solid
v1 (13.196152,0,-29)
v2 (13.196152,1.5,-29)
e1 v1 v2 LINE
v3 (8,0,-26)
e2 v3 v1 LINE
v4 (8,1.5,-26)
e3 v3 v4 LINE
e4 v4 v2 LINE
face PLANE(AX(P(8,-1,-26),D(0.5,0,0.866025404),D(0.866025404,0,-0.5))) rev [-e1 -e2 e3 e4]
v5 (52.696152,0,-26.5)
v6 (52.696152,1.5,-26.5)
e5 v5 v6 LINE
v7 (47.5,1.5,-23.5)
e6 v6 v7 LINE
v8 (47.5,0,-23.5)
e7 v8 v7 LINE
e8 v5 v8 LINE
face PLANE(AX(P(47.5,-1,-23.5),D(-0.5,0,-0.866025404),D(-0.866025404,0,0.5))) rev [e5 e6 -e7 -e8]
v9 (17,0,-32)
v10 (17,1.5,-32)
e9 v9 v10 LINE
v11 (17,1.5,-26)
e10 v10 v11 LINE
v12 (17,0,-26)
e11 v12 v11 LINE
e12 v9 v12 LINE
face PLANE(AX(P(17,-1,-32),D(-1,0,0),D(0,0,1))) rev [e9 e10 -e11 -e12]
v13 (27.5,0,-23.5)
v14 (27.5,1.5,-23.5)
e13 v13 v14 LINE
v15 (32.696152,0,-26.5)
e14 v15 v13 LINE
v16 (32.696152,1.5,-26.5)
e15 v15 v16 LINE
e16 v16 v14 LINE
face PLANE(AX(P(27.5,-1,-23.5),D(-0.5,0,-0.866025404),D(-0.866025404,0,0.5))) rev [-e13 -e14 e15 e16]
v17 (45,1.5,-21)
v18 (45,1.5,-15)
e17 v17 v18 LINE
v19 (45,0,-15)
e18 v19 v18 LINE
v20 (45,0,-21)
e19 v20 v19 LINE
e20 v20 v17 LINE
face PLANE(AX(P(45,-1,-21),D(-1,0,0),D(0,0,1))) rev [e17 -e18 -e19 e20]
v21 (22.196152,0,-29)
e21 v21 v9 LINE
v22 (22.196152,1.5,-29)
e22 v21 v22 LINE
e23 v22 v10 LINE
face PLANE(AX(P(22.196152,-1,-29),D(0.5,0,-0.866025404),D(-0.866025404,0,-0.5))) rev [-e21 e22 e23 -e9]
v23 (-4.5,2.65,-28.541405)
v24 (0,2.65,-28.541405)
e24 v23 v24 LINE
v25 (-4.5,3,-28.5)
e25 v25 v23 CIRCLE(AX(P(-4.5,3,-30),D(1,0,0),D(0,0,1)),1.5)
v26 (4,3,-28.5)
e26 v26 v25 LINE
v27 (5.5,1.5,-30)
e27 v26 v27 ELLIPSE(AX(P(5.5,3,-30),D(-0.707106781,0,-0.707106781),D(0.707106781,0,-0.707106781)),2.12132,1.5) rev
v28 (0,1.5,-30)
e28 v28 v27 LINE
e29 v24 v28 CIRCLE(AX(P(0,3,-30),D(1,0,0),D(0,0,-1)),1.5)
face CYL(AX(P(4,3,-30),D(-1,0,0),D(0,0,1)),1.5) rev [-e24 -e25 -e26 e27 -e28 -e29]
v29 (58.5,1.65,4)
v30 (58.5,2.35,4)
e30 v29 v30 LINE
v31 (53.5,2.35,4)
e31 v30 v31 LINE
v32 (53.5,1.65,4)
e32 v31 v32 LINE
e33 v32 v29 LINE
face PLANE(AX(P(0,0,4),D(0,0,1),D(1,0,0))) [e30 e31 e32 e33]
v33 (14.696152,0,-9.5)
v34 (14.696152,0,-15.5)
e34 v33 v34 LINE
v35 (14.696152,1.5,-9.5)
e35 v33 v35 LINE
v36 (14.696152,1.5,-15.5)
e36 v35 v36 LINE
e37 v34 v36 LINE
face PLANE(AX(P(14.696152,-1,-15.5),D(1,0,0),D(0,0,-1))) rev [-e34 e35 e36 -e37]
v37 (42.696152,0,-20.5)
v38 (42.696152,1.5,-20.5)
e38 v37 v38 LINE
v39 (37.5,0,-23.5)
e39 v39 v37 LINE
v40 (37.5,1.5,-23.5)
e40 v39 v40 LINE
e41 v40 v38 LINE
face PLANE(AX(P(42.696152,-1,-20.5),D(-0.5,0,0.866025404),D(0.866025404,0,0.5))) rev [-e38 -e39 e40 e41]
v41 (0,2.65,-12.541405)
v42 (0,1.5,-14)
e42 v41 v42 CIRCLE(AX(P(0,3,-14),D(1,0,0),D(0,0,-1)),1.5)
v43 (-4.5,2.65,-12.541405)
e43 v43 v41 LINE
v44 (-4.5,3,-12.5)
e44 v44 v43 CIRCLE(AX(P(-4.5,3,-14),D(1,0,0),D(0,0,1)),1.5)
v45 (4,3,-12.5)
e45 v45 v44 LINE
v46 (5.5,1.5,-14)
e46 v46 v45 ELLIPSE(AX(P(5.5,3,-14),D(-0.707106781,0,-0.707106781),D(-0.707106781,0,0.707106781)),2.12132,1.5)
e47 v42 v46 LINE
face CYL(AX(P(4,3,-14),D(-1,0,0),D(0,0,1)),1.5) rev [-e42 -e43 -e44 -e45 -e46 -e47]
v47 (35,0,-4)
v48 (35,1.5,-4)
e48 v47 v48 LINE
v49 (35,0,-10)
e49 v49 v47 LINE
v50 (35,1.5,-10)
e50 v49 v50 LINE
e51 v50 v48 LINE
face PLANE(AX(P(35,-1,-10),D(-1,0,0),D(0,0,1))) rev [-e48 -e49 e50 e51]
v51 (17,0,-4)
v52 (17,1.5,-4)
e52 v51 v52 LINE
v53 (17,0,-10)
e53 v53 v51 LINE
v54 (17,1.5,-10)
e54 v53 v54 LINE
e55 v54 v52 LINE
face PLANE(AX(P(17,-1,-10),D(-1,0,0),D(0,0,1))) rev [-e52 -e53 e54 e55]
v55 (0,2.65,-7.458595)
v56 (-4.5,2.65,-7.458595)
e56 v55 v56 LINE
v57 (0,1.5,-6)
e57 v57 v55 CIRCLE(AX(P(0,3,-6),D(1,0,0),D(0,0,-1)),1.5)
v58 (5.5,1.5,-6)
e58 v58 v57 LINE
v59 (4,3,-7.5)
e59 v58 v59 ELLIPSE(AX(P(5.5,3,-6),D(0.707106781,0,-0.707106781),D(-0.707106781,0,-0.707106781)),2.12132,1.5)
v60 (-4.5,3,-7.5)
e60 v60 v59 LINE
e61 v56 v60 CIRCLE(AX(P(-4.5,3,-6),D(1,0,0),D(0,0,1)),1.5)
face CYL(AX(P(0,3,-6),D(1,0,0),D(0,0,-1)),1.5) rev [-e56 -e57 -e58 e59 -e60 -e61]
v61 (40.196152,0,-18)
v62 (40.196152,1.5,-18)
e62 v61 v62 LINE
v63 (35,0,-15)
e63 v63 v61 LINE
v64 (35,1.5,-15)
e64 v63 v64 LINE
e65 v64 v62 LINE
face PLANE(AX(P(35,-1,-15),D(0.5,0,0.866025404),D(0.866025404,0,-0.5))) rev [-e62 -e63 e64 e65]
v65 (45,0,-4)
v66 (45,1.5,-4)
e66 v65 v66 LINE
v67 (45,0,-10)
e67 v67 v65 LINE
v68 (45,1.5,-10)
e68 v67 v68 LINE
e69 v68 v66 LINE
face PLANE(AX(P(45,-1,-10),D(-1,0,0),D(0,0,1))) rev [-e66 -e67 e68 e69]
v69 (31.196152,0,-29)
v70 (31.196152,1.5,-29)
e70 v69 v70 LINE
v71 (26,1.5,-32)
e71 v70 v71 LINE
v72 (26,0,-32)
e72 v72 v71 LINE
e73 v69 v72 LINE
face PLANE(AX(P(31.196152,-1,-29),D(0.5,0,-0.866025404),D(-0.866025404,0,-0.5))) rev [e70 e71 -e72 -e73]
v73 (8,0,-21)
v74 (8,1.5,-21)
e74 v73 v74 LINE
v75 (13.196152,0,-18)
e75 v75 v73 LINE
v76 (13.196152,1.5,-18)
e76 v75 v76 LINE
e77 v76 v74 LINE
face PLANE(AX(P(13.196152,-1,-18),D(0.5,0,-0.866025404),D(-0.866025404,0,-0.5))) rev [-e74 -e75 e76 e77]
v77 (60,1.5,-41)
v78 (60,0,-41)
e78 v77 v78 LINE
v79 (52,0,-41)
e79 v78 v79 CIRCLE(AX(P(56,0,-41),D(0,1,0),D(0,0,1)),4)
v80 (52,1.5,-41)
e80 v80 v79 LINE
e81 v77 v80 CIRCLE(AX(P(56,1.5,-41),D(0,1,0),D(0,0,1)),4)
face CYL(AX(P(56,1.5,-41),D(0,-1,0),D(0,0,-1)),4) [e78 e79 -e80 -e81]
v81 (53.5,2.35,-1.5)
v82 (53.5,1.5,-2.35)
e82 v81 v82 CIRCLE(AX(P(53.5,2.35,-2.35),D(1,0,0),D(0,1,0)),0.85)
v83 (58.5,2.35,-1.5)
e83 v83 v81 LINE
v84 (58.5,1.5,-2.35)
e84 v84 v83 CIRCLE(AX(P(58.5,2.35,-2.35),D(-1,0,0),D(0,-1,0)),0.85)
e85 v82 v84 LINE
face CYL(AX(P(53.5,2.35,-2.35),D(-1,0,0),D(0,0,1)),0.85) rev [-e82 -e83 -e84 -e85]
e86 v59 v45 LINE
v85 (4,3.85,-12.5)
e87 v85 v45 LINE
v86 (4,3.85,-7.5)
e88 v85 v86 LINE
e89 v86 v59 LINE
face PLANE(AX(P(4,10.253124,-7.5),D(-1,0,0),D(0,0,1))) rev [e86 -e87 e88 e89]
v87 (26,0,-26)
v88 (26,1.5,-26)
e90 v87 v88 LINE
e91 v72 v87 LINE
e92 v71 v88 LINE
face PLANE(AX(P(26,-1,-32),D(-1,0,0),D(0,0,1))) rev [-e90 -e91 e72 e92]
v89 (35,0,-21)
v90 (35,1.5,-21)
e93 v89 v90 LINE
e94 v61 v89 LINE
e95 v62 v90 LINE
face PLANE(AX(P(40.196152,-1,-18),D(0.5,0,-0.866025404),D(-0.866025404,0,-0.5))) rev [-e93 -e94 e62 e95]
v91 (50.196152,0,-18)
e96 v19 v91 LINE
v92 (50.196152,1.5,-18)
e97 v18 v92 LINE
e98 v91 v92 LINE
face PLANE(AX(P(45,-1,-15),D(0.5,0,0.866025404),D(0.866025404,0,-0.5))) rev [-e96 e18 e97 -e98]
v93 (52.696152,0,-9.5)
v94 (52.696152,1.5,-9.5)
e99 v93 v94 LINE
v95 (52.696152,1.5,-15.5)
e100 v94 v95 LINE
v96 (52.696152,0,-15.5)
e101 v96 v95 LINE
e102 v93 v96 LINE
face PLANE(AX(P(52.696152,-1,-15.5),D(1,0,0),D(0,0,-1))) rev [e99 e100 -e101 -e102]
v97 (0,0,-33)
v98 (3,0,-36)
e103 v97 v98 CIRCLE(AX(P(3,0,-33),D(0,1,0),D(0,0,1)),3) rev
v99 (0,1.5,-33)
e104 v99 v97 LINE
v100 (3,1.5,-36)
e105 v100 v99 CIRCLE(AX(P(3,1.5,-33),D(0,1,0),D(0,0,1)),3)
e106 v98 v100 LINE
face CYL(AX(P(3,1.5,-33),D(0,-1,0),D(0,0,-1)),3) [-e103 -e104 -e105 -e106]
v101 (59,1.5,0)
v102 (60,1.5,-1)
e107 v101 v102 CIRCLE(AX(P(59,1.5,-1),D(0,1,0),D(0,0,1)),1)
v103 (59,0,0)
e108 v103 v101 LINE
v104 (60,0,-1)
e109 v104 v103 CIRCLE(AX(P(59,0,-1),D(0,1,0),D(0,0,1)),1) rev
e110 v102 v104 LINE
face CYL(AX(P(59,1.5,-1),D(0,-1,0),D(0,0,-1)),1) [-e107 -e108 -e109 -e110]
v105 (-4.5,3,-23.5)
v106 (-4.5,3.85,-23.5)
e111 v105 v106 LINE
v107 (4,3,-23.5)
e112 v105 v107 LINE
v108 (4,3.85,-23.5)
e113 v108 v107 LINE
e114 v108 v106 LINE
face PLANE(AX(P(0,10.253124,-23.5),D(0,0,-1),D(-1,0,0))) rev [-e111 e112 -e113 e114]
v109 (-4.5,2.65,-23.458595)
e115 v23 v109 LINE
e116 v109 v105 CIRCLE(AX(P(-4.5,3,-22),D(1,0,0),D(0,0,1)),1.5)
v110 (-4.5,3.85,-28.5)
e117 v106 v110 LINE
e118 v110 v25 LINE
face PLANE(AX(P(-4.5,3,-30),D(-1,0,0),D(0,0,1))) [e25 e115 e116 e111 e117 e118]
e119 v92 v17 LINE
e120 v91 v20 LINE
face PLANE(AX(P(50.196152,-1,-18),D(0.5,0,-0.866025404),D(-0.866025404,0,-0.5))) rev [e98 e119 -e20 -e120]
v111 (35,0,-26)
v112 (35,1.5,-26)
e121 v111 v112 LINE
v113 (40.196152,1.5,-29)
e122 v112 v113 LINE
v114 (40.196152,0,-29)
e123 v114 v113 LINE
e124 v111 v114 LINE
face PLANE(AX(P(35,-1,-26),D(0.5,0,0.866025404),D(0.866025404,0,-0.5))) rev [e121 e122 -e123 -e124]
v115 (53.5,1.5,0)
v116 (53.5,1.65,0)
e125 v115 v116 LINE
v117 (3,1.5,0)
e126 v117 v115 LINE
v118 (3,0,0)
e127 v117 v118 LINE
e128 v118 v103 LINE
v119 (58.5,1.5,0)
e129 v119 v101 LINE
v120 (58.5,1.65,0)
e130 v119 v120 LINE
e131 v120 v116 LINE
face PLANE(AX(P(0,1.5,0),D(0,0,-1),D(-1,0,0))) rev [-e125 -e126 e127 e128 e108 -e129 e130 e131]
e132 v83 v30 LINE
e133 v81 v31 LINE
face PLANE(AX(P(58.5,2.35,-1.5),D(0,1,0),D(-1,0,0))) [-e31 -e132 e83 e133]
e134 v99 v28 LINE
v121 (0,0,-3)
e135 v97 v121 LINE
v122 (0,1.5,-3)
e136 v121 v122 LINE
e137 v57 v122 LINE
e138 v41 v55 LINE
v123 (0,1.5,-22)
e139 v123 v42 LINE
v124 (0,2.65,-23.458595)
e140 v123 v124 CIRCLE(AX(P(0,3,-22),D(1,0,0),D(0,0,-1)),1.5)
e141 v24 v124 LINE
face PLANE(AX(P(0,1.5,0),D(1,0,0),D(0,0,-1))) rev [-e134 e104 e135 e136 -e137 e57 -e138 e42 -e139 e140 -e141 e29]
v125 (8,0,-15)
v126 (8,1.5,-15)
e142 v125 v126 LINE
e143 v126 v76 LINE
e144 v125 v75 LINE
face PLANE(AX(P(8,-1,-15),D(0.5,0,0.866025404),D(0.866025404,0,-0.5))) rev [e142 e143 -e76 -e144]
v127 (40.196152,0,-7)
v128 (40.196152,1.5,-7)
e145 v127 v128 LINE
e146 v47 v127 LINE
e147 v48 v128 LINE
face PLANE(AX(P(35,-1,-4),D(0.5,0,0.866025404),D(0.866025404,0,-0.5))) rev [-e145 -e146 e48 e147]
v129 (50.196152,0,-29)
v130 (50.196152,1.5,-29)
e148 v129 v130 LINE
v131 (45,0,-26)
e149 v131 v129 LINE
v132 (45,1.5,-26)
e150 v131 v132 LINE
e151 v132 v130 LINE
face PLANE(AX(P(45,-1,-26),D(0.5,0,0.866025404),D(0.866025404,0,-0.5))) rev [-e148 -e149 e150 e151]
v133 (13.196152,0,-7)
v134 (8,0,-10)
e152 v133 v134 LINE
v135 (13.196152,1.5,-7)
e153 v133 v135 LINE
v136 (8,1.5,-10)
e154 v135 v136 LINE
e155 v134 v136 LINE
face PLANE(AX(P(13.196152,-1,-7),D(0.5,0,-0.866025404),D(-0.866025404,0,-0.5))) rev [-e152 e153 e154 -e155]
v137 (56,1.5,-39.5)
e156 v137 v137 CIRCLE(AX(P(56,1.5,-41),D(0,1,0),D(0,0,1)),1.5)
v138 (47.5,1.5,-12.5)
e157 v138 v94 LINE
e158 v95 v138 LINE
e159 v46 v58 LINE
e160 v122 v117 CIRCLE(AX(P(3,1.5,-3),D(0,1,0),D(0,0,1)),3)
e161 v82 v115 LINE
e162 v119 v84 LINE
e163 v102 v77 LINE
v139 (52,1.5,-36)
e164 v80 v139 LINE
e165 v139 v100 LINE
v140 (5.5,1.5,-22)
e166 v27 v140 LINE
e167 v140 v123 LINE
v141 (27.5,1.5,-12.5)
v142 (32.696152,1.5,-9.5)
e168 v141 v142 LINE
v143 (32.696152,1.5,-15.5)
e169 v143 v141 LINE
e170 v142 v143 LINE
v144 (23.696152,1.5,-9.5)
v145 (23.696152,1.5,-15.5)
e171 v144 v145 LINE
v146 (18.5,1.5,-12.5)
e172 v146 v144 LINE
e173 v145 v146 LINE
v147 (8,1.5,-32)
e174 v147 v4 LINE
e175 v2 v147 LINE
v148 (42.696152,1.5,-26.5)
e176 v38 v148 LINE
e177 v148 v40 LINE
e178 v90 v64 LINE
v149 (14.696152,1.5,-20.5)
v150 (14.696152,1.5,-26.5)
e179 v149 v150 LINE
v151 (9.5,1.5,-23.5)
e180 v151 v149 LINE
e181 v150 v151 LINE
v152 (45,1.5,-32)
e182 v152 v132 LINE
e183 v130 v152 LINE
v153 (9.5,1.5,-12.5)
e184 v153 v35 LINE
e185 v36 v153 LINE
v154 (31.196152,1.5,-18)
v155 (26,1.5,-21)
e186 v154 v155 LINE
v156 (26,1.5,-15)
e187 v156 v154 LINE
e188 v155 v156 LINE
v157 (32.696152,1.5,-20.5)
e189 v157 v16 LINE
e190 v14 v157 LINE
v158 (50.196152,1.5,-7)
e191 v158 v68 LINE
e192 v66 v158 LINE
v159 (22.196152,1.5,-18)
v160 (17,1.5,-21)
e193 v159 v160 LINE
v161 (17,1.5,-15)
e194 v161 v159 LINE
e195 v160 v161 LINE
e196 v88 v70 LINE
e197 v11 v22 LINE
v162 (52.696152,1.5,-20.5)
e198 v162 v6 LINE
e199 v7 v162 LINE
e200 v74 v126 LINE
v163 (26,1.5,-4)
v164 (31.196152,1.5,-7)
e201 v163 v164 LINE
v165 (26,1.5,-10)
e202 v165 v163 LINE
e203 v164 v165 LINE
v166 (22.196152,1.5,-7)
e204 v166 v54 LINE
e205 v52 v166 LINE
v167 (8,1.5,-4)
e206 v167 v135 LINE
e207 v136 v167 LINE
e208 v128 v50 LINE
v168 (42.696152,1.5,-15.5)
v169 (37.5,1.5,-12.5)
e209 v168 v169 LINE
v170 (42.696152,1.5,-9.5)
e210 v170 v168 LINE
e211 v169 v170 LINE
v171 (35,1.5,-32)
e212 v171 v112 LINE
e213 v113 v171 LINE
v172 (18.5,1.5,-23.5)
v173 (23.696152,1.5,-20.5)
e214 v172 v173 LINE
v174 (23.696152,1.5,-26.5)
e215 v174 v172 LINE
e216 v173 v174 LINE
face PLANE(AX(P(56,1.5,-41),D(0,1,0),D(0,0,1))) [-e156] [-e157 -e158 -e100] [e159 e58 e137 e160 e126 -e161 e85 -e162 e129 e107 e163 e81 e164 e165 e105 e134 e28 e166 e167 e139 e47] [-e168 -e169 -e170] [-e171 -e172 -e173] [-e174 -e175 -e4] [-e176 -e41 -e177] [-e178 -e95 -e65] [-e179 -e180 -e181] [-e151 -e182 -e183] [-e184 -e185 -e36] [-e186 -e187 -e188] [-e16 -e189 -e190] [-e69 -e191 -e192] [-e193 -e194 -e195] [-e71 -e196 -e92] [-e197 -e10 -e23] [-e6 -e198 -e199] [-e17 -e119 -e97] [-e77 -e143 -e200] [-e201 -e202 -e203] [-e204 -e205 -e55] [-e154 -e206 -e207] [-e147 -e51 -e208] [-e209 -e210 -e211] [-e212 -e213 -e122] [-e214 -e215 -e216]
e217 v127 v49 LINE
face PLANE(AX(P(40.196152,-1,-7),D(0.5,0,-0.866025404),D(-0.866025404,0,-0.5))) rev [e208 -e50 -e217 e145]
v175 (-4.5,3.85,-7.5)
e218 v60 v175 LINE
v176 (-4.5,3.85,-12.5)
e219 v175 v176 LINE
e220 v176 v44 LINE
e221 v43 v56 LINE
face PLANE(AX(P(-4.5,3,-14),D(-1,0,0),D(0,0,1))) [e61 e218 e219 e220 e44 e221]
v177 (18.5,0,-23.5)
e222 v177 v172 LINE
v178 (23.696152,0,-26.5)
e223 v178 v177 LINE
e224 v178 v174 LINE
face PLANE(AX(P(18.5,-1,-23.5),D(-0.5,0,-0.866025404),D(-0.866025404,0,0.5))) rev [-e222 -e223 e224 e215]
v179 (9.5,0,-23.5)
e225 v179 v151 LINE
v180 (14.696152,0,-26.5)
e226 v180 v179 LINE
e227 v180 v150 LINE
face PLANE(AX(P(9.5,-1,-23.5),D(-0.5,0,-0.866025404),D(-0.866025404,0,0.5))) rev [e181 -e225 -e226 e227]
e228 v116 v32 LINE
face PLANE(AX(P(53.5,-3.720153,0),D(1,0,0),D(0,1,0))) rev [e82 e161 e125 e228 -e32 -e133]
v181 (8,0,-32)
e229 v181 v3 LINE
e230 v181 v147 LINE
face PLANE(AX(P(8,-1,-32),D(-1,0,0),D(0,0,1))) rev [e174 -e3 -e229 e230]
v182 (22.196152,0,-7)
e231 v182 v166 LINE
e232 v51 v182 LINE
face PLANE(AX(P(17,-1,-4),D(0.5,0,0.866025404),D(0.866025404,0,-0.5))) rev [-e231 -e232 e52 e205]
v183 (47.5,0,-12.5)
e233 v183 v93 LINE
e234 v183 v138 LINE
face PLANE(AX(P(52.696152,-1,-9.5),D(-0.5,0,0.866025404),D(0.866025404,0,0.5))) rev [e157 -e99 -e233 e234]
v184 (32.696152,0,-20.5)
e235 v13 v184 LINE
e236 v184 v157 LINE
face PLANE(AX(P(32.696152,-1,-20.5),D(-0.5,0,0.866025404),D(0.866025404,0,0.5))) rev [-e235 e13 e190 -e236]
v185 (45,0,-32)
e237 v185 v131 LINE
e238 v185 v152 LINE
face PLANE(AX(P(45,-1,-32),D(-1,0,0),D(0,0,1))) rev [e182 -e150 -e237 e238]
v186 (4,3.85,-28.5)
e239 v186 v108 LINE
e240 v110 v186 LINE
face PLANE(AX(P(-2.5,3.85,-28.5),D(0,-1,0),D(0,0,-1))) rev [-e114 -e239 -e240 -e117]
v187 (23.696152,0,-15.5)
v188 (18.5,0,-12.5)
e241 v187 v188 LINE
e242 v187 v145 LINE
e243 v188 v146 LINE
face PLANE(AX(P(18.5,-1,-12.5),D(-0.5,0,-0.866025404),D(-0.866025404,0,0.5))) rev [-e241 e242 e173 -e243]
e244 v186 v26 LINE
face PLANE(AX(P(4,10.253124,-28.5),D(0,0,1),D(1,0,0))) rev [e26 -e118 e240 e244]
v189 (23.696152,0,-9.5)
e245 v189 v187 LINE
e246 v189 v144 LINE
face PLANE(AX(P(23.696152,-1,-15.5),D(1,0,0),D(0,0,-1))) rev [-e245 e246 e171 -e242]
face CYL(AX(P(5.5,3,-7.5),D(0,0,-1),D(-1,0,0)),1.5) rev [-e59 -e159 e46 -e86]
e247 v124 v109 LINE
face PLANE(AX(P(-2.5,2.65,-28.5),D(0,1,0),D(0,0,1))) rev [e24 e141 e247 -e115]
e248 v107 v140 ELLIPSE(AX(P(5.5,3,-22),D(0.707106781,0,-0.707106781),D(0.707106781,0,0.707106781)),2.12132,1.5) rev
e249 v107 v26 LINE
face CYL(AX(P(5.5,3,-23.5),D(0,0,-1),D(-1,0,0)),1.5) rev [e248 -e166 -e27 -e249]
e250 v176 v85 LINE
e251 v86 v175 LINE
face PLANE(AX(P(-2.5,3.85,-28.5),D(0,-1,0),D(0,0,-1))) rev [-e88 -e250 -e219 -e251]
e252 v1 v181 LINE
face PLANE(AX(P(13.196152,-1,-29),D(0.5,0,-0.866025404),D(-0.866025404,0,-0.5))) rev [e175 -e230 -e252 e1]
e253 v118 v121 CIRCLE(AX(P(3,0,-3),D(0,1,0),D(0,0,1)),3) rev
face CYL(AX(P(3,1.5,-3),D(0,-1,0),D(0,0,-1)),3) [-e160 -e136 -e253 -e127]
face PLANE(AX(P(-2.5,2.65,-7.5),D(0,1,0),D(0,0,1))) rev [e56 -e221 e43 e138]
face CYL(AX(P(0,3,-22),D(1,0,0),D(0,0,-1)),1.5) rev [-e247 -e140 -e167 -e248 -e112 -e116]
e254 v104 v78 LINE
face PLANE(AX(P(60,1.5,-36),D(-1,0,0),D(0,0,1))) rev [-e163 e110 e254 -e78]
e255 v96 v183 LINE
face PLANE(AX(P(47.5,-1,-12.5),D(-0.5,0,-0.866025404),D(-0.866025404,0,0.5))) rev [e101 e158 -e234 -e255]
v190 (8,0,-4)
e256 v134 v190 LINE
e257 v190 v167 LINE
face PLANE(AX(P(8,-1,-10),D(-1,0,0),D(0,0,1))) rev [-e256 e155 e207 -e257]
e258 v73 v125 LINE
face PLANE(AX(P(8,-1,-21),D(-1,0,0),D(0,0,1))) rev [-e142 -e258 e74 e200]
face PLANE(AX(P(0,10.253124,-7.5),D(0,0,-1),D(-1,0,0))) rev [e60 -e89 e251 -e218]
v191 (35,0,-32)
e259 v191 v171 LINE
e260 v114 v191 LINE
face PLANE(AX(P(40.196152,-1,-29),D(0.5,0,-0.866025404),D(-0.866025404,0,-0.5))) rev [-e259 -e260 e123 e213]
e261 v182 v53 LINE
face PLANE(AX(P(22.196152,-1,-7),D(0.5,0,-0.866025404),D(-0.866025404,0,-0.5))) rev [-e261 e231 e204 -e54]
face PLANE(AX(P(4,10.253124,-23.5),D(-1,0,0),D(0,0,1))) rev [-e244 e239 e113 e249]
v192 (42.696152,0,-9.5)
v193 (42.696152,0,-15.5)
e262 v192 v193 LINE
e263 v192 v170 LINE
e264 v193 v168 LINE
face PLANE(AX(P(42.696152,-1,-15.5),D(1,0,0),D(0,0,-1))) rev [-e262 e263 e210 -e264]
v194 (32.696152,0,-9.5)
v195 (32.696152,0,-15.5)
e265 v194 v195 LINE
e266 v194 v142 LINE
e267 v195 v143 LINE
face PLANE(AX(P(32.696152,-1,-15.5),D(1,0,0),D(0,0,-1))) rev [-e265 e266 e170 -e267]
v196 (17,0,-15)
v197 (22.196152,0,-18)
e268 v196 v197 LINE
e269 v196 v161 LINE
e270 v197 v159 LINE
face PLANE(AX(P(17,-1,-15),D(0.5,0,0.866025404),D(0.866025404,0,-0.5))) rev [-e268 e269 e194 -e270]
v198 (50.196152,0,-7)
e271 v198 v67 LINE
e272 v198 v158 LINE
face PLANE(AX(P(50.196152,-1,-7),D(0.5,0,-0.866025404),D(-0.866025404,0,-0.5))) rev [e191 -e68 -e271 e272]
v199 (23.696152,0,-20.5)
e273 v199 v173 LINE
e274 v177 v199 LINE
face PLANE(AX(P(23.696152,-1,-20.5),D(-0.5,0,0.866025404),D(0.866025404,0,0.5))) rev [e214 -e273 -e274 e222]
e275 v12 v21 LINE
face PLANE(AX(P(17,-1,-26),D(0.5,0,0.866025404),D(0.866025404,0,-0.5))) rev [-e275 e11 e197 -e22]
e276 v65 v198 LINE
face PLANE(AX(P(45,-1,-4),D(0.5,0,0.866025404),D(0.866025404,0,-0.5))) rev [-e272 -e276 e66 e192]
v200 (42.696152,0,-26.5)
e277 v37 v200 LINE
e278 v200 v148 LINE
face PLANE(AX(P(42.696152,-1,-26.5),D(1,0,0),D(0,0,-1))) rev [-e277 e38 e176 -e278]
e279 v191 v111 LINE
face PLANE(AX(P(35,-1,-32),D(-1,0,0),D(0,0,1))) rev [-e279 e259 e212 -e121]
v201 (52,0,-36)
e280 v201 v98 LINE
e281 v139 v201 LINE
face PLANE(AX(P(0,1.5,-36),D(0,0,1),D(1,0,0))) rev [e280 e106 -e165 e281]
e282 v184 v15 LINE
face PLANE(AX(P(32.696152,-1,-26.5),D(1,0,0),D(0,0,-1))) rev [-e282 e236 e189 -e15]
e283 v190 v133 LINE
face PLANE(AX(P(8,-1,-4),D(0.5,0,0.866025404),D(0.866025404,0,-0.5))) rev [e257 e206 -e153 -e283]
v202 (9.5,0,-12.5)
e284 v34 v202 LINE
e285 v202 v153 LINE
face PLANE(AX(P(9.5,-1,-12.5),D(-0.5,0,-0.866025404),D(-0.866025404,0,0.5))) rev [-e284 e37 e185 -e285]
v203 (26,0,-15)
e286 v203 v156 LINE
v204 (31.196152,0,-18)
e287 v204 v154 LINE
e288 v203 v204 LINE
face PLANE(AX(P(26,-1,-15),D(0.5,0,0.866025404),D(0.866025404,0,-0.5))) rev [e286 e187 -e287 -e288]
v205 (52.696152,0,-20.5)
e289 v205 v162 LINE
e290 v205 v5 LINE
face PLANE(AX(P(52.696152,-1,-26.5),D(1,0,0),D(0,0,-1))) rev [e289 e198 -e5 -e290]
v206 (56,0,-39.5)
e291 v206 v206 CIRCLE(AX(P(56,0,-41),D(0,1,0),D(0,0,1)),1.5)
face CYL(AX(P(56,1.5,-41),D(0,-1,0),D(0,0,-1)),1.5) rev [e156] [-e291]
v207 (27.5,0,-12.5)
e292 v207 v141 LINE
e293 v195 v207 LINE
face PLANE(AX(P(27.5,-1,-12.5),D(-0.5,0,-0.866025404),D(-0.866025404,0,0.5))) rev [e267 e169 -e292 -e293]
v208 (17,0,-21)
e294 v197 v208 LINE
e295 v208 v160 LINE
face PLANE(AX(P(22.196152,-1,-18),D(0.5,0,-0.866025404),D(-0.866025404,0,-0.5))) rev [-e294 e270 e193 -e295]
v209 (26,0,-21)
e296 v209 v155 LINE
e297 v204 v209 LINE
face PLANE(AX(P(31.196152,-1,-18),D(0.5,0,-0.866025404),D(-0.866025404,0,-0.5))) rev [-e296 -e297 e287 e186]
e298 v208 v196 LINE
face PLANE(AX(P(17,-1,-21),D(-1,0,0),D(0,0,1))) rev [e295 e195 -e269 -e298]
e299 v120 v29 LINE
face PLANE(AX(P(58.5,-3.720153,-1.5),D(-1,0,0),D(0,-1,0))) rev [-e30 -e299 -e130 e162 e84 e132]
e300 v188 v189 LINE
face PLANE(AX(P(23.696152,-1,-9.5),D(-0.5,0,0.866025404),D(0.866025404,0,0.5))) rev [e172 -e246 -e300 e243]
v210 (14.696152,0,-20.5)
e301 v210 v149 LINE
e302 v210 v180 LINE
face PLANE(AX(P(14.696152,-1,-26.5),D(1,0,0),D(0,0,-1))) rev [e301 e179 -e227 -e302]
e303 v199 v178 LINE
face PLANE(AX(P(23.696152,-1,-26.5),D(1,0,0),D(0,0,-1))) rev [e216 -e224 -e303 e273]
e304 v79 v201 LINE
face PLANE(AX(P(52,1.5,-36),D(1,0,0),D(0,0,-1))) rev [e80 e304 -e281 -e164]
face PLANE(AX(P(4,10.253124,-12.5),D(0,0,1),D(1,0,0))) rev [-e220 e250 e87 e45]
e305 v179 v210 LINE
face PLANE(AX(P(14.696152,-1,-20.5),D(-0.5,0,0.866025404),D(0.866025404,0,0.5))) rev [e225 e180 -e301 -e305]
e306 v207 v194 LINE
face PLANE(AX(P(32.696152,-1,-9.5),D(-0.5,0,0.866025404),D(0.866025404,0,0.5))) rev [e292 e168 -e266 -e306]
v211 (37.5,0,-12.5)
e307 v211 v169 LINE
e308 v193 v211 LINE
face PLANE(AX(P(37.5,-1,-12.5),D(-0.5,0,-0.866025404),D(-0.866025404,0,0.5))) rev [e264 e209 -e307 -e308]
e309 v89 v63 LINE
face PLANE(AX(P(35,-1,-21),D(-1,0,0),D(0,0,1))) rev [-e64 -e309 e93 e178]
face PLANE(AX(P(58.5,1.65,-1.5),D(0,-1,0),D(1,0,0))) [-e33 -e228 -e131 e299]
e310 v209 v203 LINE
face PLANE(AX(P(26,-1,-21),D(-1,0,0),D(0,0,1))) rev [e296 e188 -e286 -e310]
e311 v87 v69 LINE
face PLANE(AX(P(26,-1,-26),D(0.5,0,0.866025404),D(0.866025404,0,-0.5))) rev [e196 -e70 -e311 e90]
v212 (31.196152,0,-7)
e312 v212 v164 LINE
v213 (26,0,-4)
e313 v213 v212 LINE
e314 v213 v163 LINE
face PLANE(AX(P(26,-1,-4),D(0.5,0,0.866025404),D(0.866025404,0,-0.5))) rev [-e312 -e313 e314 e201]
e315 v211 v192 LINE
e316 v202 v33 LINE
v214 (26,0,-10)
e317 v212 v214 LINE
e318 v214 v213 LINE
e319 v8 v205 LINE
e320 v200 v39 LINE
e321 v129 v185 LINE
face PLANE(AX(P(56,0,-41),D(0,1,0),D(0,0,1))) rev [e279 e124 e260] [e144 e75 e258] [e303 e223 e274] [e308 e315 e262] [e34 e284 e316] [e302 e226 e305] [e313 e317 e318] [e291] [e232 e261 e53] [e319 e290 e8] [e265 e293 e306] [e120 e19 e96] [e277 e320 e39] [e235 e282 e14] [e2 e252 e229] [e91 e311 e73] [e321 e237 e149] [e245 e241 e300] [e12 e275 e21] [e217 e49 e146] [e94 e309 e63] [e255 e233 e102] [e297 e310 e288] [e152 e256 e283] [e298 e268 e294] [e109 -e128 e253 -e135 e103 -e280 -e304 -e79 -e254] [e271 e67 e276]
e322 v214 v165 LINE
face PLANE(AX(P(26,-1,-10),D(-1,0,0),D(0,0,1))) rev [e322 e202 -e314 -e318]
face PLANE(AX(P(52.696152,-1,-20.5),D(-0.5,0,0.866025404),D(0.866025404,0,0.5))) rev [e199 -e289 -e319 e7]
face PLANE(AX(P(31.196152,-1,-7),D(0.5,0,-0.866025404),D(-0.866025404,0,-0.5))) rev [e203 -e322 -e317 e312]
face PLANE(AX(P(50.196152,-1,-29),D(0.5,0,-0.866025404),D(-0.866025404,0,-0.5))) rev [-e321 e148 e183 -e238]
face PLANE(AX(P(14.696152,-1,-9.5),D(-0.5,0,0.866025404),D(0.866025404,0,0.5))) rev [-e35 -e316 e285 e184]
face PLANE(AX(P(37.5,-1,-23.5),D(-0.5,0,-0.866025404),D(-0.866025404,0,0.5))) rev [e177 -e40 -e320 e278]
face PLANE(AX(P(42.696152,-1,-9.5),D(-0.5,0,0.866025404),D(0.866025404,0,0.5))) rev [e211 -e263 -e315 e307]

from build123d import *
from OCP.BRepFilletAPI import BRepFilletAPI_MakeFillet

# Parameters (mm, degrees)
SKETCH1_R                = 1.5
BOSS_EXTRUDE1_DEPTH      = 1.5
BOSS_EXTRUDE2_DEPTH      = 2
BOSS_EXTRUDE2_DEPTH_BACK = 1.5
SKETCH3_W                = 5
SKETCH3_H                = 0.7
SKETCH4_W                = 5
SKETCH4_H                = 1.5
BOSS_EXTRUDE3_DEPTH      = 0.15
FILLET2_R                = 0.85
SKETCH5_W                = 5
SKETCH5_H                = 1.2
BOSS_EXTRUDE4_DEPTH      = 2.5
BOSS_EXTRUDE4_2_DEPTH    = 2.5
SKETCH6_W                = 4
SKETCH6_H                = 5
BOSS_EXTRUDE5_DEPTH      = 2.35
FILLET3_R                = 1.5
CUT_EXTRUDE1_DEPTH       = 2.5
FILLET4_R1               = 3
FILLET4_R2               = 1
SKETCH8_W                = 5
SKETCH8_H                = 0.7
BOSS_EXTRUDE6_DEPTH      = 2
BOSS_EXTRUDE7_DEPTH      = 2


with BuildPart() as part:
    # Sketch1 → Boss-Extrude1 (new body)
    with BuildSketch(Plane(origin=(0, 0, 0), x_dir=(1, 0, 0), z_dir=(0, 1, 0))):
        with BuildLine():
            Line((0, 0), (60, 0))
            Line((60, 0), (60, 36))
            Line((60, 36), (60, 41))
            ThreePointArc((60, 41), (56, 45), (52, 41))
            Line((52, 41), (52, 36))
            Line((52, 36), (0, 36))
            Line((0, 36), (0, 0))
        make_face()
        with Locations(Location((56, 41, 0), (0, 0, 270))):
            Circle(SKETCH1_R, mode=Mode.SUBTRACT)
    extrude(amount=BOSS_EXTRUDE1_DEPTH)



with BuildPart() as body_2:
    # Sketch3 → Boss-Extrude2 (new, two sides: drawn at the far end of the back side and taken through both)
    with BuildSketch(Plane.XY.offset(-BOSS_EXTRUDE2_DEPTH_BACK)):
        with Locations((56, 2)):
            Rectangle(SKETCH3_W, SKETCH3_H)
    extrude(amount=BOSS_EXTRUDE2_DEPTH + BOSS_EXTRUDE2_DEPTH_BACK)


with BuildPart() as part_1:
    add(part.part)

    add(body_2.part)  # Boss-Extrude3 merges body 2
    # Sketch4 → Boss-Extrude3 (add)
    with BuildSketch(Plane.XZ.offset(-1.65)):
        with Locations((56, -0.75)):
            Rectangle(SKETCH4_W, SKETCH4_H)
    extrude(amount=BOSS_EXTRUDE3_DEPTH)

    # Fillet2
    fillet2_edges = [part_1.edges().sort_by_distance(p)[0] for p in [
        (56, 1.5, -1.5),
    ]]
    fillet(fillet2_edges, radius=FILLET2_R - 0.0001)  # a hair under: the kernel refuses the full size



with BuildPart() as body_2_2:
    # Sketch5 → Boss-Extrude4 (new body)
    with BuildSketch(Plane.ZY):
        with Locations((-10, 3.25)):
            Rectangle(SKETCH5_W, SKETCH5_H)
    extrude(amount=BOSS_EXTRUDE4_DEPTH)


with BuildPart() as body_3:
    # Sketch5 → Boss-Extrude4 2 (new body)
    with BuildSketch(Plane.ZY):
        with Locations((-26, 3.25)):
            Rectangle(SKETCH5_W, SKETCH5_H)
    extrude(amount=BOSS_EXTRUDE4_2_DEPTH)


with BuildPart() as part_2:
    add(part_1.part)

    add(body_2_2.part)  # Boss-Extrude5 merges body 2 2

    add(body_3.part)  # Boss-Extrude5 merges body 3
    # Sketch6 → Boss-Extrude5 (add)
    with BuildSketch(Plane(origin=(0, 1.5, 0), x_dir=(1, 0, 0), z_dir=(0, 1, 0))):
        with Locations((2, 26)):
            Rectangle(SKETCH6_W, SKETCH6_H)
        with Locations((2, 10)):
            Rectangle(SKETCH6_W, SKETCH6_H)
    extrude(amount=BOSS_EXTRUDE5_DEPTH)

    # Fillet3
    fillet3_edges = [part_2.edges().sort_by_distance(p)[0] for p in [
        (2, 1.5, -7.5),
    ]]
    fillet(fillet3_edges, radius=FILLET3_R)
    fillet3_2_edges = [part_2.edges().sort_by_distance(p)[0] for p in [
        (4, 1.5, -10),
    ]]
    fillet(fillet3_2_edges, radius=FILLET3_R)
    fillet3_3_edges = [part_2.edges().sort_by_distance(p)[0] for p in [
        (2, 1.5, -12.5),
    ]]
    fillet(fillet3_3_edges, radius=FILLET3_R)
    fillet3_4_edges = [part_2.edges().sort_by_distance(p)[0] for p in [
        (2, 1.5, -23.5),
    ]]
    fillet(fillet3_4_edges, radius=FILLET3_R)
    fillet3_5_edges = [part_2.edges().sort_by_distance(p)[0] for p in [
        (4, 1.5, -26),
    ]]
    fillet(fillet3_5_edges, radius=FILLET3_R - 0.0001)  # a hair under: the kernel refuses the full size
    fillet3_6_edges = [part_2.edges().sort_by_distance(p)[0] for p in [
        (2, 1.5, -28.5),
    ]]
    fillet(fillet3_6_edges, radius=FILLET3_R - 0.0001)  # a hair under: the kernel refuses the full size

    # Sketch7 → Cut-Extrude1 (cut)
    with BuildSketch(Plane(origin=(0, 1.5, 0), x_dir=(1, 0, 0), z_dir=(0, 1, 0))):
        Polygon((13.196152423, 29), (8, 32), (8, 26), align=None)
        Polygon((17, 26), (22.196152423, 29), (17, 32), align=None)
        Polygon((26, 26), (31.196152423, 29), (26, 32), align=None)
        Polygon((35, 26), (40.196152423, 29), (35, 32), align=None)
        Polygon((13.196152423, 18), (8, 21), (8, 15), align=None)
        Polygon((17, 15), (22.196152423, 18), (17, 21), align=None)
        Polygon((26, 15), (31.196152423, 18), (26, 21), align=None)
        Polygon((35, 15), (40.196152423, 18), (35, 21), align=None)
        Polygon((13.196152423, 7), (8, 10), (8, 4), align=None)
        Polygon((17, 4), (22.196152423, 7), (17, 10), align=None)
        Polygon((26, 4), (31.196152423, 7), (26, 10), align=None)
        Polygon((35, 4), (40.196152423, 7), (35, 10), align=None)
        Polygon((9.5, 23.5), (14.696152423, 26.5), (14.696152423, 20.5), align=None)
        Polygon((23.696152423, 20.5), (18.5, 23.5), (23.696152423, 26.5), align=None)
        Polygon((32.696152423, 20.5), (27.5, 23.5), (32.696152423, 26.5), align=None)
        Polygon((14.696152423, 9.5), (9.5, 12.5), (14.696152423, 15.5), align=None)
        Polygon((18.5, 12.5), (23.696152423, 15.5), (23.696152423, 9.5), align=None)
        Polygon((32.696152423, 9.5), (27.5, 12.5), (32.696152423, 15.5), align=None)
        Polygon((45, 26), (50.196152423, 29), (45, 32), align=None)
        Polygon((45, 15), (50.196152423, 18), (45, 21), align=None)
        Polygon((45, 4), (50.196152423, 7), (45, 10), align=None)
        Polygon((42.696152423, 20.5), (37.5, 23.5), (42.696152423, 26.5), align=None)
        Polygon((42.696152423, 9.5), (37.5, 12.5), (42.696152423, 15.5), align=None)
        Polygon((52.696152423, 20.5), (47.5, 23.5), (52.696152423, 26.5), align=None)
        Polygon((52.696152423, 9.5), (47.5, 12.5), (52.696152423, 15.5), align=None)
    extrude(amount=-CUT_EXTRUDE1_DEPTH, mode=Mode.SUBTRACT)

    # Fillet4: one fillet with a radius per group of edges: ONE call of the kernel's fillet builder (fillet() takes one radius for all edges)
    fillet4_edges_1 = [part_2.edges().sort_by_distance(p)[0] for p in [
        (0, 0.75, 0),
        (0, 0.75, -36),
    ]]
    fillet4_edges_2 = [part_2.edges().sort_by_distance(p)[0] for p in [
        (60, 0.75, 0),
    ]]
    fillet4 = BRepFilletAPI_MakeFillet(part_2.part.solid().wrapped)
    for e in fillet4_edges_1:
        fillet4.Add(FILLET4_R1, e.wrapped)
    for e in fillet4_edges_2:
        fillet4.Add(FILLET4_R2, e.wrapped)
    add(Compound.cast(fillet4.Shape()), mode=Mode.REPLACE)

    # Sketch8 → Boss-Extrude6 (add)
    with BuildSketch(Plane.XY.offset(2)):
        with Locations((56, 2)):
            Rectangle(SKETCH8_W, SKETCH8_H)
    extrude(amount=BOSS_EXTRUDE6_DEPTH)

    # Sketch9 → Boss-Extrude7 (add)
    with BuildSketch(Plane.ZY.offset(2.5)):
        with BuildLine():
            Line((-28.541404785, 2.65), (-23.458595215, 2.65))
            ThreePointArc((-23.458595215, 2.65), (-23.489612839, 2.823779714), (-23.5, 3))
            Line((-23.5, 3), (-23.5, 3.85))
            Line((-23.5, 3.85), (-28.5, 3.85))
            Line((-28.5, 3.85), (-28.5, 3))
            ThreePointArc((-28.5, 3), (-28.510387161, 2.823779714), (-28.541404785, 2.65))
        make_face()
        with BuildLine():
            Line((-12.541404785, 2.65), (-7.458595215, 2.65))
            ThreePointArc((-7.458595215, 2.65), (-7.489612839, 2.823779714), (-7.5, 3))
            Line((-7.5, 3), (-7.5, 3.85))
            Line((-7.5, 3.85), (-12.5, 3.85))
            Line((-12.5, 3.85), (-12.5, 3))
            ThreePointArc((-12.5, 3), (-12.510387161, 2.823779714), (-12.541404785, 2.65))
        make_face()
    extrude(amount=BOSS_EXTRUDE7_DEPTH)


solid = part_2.part
